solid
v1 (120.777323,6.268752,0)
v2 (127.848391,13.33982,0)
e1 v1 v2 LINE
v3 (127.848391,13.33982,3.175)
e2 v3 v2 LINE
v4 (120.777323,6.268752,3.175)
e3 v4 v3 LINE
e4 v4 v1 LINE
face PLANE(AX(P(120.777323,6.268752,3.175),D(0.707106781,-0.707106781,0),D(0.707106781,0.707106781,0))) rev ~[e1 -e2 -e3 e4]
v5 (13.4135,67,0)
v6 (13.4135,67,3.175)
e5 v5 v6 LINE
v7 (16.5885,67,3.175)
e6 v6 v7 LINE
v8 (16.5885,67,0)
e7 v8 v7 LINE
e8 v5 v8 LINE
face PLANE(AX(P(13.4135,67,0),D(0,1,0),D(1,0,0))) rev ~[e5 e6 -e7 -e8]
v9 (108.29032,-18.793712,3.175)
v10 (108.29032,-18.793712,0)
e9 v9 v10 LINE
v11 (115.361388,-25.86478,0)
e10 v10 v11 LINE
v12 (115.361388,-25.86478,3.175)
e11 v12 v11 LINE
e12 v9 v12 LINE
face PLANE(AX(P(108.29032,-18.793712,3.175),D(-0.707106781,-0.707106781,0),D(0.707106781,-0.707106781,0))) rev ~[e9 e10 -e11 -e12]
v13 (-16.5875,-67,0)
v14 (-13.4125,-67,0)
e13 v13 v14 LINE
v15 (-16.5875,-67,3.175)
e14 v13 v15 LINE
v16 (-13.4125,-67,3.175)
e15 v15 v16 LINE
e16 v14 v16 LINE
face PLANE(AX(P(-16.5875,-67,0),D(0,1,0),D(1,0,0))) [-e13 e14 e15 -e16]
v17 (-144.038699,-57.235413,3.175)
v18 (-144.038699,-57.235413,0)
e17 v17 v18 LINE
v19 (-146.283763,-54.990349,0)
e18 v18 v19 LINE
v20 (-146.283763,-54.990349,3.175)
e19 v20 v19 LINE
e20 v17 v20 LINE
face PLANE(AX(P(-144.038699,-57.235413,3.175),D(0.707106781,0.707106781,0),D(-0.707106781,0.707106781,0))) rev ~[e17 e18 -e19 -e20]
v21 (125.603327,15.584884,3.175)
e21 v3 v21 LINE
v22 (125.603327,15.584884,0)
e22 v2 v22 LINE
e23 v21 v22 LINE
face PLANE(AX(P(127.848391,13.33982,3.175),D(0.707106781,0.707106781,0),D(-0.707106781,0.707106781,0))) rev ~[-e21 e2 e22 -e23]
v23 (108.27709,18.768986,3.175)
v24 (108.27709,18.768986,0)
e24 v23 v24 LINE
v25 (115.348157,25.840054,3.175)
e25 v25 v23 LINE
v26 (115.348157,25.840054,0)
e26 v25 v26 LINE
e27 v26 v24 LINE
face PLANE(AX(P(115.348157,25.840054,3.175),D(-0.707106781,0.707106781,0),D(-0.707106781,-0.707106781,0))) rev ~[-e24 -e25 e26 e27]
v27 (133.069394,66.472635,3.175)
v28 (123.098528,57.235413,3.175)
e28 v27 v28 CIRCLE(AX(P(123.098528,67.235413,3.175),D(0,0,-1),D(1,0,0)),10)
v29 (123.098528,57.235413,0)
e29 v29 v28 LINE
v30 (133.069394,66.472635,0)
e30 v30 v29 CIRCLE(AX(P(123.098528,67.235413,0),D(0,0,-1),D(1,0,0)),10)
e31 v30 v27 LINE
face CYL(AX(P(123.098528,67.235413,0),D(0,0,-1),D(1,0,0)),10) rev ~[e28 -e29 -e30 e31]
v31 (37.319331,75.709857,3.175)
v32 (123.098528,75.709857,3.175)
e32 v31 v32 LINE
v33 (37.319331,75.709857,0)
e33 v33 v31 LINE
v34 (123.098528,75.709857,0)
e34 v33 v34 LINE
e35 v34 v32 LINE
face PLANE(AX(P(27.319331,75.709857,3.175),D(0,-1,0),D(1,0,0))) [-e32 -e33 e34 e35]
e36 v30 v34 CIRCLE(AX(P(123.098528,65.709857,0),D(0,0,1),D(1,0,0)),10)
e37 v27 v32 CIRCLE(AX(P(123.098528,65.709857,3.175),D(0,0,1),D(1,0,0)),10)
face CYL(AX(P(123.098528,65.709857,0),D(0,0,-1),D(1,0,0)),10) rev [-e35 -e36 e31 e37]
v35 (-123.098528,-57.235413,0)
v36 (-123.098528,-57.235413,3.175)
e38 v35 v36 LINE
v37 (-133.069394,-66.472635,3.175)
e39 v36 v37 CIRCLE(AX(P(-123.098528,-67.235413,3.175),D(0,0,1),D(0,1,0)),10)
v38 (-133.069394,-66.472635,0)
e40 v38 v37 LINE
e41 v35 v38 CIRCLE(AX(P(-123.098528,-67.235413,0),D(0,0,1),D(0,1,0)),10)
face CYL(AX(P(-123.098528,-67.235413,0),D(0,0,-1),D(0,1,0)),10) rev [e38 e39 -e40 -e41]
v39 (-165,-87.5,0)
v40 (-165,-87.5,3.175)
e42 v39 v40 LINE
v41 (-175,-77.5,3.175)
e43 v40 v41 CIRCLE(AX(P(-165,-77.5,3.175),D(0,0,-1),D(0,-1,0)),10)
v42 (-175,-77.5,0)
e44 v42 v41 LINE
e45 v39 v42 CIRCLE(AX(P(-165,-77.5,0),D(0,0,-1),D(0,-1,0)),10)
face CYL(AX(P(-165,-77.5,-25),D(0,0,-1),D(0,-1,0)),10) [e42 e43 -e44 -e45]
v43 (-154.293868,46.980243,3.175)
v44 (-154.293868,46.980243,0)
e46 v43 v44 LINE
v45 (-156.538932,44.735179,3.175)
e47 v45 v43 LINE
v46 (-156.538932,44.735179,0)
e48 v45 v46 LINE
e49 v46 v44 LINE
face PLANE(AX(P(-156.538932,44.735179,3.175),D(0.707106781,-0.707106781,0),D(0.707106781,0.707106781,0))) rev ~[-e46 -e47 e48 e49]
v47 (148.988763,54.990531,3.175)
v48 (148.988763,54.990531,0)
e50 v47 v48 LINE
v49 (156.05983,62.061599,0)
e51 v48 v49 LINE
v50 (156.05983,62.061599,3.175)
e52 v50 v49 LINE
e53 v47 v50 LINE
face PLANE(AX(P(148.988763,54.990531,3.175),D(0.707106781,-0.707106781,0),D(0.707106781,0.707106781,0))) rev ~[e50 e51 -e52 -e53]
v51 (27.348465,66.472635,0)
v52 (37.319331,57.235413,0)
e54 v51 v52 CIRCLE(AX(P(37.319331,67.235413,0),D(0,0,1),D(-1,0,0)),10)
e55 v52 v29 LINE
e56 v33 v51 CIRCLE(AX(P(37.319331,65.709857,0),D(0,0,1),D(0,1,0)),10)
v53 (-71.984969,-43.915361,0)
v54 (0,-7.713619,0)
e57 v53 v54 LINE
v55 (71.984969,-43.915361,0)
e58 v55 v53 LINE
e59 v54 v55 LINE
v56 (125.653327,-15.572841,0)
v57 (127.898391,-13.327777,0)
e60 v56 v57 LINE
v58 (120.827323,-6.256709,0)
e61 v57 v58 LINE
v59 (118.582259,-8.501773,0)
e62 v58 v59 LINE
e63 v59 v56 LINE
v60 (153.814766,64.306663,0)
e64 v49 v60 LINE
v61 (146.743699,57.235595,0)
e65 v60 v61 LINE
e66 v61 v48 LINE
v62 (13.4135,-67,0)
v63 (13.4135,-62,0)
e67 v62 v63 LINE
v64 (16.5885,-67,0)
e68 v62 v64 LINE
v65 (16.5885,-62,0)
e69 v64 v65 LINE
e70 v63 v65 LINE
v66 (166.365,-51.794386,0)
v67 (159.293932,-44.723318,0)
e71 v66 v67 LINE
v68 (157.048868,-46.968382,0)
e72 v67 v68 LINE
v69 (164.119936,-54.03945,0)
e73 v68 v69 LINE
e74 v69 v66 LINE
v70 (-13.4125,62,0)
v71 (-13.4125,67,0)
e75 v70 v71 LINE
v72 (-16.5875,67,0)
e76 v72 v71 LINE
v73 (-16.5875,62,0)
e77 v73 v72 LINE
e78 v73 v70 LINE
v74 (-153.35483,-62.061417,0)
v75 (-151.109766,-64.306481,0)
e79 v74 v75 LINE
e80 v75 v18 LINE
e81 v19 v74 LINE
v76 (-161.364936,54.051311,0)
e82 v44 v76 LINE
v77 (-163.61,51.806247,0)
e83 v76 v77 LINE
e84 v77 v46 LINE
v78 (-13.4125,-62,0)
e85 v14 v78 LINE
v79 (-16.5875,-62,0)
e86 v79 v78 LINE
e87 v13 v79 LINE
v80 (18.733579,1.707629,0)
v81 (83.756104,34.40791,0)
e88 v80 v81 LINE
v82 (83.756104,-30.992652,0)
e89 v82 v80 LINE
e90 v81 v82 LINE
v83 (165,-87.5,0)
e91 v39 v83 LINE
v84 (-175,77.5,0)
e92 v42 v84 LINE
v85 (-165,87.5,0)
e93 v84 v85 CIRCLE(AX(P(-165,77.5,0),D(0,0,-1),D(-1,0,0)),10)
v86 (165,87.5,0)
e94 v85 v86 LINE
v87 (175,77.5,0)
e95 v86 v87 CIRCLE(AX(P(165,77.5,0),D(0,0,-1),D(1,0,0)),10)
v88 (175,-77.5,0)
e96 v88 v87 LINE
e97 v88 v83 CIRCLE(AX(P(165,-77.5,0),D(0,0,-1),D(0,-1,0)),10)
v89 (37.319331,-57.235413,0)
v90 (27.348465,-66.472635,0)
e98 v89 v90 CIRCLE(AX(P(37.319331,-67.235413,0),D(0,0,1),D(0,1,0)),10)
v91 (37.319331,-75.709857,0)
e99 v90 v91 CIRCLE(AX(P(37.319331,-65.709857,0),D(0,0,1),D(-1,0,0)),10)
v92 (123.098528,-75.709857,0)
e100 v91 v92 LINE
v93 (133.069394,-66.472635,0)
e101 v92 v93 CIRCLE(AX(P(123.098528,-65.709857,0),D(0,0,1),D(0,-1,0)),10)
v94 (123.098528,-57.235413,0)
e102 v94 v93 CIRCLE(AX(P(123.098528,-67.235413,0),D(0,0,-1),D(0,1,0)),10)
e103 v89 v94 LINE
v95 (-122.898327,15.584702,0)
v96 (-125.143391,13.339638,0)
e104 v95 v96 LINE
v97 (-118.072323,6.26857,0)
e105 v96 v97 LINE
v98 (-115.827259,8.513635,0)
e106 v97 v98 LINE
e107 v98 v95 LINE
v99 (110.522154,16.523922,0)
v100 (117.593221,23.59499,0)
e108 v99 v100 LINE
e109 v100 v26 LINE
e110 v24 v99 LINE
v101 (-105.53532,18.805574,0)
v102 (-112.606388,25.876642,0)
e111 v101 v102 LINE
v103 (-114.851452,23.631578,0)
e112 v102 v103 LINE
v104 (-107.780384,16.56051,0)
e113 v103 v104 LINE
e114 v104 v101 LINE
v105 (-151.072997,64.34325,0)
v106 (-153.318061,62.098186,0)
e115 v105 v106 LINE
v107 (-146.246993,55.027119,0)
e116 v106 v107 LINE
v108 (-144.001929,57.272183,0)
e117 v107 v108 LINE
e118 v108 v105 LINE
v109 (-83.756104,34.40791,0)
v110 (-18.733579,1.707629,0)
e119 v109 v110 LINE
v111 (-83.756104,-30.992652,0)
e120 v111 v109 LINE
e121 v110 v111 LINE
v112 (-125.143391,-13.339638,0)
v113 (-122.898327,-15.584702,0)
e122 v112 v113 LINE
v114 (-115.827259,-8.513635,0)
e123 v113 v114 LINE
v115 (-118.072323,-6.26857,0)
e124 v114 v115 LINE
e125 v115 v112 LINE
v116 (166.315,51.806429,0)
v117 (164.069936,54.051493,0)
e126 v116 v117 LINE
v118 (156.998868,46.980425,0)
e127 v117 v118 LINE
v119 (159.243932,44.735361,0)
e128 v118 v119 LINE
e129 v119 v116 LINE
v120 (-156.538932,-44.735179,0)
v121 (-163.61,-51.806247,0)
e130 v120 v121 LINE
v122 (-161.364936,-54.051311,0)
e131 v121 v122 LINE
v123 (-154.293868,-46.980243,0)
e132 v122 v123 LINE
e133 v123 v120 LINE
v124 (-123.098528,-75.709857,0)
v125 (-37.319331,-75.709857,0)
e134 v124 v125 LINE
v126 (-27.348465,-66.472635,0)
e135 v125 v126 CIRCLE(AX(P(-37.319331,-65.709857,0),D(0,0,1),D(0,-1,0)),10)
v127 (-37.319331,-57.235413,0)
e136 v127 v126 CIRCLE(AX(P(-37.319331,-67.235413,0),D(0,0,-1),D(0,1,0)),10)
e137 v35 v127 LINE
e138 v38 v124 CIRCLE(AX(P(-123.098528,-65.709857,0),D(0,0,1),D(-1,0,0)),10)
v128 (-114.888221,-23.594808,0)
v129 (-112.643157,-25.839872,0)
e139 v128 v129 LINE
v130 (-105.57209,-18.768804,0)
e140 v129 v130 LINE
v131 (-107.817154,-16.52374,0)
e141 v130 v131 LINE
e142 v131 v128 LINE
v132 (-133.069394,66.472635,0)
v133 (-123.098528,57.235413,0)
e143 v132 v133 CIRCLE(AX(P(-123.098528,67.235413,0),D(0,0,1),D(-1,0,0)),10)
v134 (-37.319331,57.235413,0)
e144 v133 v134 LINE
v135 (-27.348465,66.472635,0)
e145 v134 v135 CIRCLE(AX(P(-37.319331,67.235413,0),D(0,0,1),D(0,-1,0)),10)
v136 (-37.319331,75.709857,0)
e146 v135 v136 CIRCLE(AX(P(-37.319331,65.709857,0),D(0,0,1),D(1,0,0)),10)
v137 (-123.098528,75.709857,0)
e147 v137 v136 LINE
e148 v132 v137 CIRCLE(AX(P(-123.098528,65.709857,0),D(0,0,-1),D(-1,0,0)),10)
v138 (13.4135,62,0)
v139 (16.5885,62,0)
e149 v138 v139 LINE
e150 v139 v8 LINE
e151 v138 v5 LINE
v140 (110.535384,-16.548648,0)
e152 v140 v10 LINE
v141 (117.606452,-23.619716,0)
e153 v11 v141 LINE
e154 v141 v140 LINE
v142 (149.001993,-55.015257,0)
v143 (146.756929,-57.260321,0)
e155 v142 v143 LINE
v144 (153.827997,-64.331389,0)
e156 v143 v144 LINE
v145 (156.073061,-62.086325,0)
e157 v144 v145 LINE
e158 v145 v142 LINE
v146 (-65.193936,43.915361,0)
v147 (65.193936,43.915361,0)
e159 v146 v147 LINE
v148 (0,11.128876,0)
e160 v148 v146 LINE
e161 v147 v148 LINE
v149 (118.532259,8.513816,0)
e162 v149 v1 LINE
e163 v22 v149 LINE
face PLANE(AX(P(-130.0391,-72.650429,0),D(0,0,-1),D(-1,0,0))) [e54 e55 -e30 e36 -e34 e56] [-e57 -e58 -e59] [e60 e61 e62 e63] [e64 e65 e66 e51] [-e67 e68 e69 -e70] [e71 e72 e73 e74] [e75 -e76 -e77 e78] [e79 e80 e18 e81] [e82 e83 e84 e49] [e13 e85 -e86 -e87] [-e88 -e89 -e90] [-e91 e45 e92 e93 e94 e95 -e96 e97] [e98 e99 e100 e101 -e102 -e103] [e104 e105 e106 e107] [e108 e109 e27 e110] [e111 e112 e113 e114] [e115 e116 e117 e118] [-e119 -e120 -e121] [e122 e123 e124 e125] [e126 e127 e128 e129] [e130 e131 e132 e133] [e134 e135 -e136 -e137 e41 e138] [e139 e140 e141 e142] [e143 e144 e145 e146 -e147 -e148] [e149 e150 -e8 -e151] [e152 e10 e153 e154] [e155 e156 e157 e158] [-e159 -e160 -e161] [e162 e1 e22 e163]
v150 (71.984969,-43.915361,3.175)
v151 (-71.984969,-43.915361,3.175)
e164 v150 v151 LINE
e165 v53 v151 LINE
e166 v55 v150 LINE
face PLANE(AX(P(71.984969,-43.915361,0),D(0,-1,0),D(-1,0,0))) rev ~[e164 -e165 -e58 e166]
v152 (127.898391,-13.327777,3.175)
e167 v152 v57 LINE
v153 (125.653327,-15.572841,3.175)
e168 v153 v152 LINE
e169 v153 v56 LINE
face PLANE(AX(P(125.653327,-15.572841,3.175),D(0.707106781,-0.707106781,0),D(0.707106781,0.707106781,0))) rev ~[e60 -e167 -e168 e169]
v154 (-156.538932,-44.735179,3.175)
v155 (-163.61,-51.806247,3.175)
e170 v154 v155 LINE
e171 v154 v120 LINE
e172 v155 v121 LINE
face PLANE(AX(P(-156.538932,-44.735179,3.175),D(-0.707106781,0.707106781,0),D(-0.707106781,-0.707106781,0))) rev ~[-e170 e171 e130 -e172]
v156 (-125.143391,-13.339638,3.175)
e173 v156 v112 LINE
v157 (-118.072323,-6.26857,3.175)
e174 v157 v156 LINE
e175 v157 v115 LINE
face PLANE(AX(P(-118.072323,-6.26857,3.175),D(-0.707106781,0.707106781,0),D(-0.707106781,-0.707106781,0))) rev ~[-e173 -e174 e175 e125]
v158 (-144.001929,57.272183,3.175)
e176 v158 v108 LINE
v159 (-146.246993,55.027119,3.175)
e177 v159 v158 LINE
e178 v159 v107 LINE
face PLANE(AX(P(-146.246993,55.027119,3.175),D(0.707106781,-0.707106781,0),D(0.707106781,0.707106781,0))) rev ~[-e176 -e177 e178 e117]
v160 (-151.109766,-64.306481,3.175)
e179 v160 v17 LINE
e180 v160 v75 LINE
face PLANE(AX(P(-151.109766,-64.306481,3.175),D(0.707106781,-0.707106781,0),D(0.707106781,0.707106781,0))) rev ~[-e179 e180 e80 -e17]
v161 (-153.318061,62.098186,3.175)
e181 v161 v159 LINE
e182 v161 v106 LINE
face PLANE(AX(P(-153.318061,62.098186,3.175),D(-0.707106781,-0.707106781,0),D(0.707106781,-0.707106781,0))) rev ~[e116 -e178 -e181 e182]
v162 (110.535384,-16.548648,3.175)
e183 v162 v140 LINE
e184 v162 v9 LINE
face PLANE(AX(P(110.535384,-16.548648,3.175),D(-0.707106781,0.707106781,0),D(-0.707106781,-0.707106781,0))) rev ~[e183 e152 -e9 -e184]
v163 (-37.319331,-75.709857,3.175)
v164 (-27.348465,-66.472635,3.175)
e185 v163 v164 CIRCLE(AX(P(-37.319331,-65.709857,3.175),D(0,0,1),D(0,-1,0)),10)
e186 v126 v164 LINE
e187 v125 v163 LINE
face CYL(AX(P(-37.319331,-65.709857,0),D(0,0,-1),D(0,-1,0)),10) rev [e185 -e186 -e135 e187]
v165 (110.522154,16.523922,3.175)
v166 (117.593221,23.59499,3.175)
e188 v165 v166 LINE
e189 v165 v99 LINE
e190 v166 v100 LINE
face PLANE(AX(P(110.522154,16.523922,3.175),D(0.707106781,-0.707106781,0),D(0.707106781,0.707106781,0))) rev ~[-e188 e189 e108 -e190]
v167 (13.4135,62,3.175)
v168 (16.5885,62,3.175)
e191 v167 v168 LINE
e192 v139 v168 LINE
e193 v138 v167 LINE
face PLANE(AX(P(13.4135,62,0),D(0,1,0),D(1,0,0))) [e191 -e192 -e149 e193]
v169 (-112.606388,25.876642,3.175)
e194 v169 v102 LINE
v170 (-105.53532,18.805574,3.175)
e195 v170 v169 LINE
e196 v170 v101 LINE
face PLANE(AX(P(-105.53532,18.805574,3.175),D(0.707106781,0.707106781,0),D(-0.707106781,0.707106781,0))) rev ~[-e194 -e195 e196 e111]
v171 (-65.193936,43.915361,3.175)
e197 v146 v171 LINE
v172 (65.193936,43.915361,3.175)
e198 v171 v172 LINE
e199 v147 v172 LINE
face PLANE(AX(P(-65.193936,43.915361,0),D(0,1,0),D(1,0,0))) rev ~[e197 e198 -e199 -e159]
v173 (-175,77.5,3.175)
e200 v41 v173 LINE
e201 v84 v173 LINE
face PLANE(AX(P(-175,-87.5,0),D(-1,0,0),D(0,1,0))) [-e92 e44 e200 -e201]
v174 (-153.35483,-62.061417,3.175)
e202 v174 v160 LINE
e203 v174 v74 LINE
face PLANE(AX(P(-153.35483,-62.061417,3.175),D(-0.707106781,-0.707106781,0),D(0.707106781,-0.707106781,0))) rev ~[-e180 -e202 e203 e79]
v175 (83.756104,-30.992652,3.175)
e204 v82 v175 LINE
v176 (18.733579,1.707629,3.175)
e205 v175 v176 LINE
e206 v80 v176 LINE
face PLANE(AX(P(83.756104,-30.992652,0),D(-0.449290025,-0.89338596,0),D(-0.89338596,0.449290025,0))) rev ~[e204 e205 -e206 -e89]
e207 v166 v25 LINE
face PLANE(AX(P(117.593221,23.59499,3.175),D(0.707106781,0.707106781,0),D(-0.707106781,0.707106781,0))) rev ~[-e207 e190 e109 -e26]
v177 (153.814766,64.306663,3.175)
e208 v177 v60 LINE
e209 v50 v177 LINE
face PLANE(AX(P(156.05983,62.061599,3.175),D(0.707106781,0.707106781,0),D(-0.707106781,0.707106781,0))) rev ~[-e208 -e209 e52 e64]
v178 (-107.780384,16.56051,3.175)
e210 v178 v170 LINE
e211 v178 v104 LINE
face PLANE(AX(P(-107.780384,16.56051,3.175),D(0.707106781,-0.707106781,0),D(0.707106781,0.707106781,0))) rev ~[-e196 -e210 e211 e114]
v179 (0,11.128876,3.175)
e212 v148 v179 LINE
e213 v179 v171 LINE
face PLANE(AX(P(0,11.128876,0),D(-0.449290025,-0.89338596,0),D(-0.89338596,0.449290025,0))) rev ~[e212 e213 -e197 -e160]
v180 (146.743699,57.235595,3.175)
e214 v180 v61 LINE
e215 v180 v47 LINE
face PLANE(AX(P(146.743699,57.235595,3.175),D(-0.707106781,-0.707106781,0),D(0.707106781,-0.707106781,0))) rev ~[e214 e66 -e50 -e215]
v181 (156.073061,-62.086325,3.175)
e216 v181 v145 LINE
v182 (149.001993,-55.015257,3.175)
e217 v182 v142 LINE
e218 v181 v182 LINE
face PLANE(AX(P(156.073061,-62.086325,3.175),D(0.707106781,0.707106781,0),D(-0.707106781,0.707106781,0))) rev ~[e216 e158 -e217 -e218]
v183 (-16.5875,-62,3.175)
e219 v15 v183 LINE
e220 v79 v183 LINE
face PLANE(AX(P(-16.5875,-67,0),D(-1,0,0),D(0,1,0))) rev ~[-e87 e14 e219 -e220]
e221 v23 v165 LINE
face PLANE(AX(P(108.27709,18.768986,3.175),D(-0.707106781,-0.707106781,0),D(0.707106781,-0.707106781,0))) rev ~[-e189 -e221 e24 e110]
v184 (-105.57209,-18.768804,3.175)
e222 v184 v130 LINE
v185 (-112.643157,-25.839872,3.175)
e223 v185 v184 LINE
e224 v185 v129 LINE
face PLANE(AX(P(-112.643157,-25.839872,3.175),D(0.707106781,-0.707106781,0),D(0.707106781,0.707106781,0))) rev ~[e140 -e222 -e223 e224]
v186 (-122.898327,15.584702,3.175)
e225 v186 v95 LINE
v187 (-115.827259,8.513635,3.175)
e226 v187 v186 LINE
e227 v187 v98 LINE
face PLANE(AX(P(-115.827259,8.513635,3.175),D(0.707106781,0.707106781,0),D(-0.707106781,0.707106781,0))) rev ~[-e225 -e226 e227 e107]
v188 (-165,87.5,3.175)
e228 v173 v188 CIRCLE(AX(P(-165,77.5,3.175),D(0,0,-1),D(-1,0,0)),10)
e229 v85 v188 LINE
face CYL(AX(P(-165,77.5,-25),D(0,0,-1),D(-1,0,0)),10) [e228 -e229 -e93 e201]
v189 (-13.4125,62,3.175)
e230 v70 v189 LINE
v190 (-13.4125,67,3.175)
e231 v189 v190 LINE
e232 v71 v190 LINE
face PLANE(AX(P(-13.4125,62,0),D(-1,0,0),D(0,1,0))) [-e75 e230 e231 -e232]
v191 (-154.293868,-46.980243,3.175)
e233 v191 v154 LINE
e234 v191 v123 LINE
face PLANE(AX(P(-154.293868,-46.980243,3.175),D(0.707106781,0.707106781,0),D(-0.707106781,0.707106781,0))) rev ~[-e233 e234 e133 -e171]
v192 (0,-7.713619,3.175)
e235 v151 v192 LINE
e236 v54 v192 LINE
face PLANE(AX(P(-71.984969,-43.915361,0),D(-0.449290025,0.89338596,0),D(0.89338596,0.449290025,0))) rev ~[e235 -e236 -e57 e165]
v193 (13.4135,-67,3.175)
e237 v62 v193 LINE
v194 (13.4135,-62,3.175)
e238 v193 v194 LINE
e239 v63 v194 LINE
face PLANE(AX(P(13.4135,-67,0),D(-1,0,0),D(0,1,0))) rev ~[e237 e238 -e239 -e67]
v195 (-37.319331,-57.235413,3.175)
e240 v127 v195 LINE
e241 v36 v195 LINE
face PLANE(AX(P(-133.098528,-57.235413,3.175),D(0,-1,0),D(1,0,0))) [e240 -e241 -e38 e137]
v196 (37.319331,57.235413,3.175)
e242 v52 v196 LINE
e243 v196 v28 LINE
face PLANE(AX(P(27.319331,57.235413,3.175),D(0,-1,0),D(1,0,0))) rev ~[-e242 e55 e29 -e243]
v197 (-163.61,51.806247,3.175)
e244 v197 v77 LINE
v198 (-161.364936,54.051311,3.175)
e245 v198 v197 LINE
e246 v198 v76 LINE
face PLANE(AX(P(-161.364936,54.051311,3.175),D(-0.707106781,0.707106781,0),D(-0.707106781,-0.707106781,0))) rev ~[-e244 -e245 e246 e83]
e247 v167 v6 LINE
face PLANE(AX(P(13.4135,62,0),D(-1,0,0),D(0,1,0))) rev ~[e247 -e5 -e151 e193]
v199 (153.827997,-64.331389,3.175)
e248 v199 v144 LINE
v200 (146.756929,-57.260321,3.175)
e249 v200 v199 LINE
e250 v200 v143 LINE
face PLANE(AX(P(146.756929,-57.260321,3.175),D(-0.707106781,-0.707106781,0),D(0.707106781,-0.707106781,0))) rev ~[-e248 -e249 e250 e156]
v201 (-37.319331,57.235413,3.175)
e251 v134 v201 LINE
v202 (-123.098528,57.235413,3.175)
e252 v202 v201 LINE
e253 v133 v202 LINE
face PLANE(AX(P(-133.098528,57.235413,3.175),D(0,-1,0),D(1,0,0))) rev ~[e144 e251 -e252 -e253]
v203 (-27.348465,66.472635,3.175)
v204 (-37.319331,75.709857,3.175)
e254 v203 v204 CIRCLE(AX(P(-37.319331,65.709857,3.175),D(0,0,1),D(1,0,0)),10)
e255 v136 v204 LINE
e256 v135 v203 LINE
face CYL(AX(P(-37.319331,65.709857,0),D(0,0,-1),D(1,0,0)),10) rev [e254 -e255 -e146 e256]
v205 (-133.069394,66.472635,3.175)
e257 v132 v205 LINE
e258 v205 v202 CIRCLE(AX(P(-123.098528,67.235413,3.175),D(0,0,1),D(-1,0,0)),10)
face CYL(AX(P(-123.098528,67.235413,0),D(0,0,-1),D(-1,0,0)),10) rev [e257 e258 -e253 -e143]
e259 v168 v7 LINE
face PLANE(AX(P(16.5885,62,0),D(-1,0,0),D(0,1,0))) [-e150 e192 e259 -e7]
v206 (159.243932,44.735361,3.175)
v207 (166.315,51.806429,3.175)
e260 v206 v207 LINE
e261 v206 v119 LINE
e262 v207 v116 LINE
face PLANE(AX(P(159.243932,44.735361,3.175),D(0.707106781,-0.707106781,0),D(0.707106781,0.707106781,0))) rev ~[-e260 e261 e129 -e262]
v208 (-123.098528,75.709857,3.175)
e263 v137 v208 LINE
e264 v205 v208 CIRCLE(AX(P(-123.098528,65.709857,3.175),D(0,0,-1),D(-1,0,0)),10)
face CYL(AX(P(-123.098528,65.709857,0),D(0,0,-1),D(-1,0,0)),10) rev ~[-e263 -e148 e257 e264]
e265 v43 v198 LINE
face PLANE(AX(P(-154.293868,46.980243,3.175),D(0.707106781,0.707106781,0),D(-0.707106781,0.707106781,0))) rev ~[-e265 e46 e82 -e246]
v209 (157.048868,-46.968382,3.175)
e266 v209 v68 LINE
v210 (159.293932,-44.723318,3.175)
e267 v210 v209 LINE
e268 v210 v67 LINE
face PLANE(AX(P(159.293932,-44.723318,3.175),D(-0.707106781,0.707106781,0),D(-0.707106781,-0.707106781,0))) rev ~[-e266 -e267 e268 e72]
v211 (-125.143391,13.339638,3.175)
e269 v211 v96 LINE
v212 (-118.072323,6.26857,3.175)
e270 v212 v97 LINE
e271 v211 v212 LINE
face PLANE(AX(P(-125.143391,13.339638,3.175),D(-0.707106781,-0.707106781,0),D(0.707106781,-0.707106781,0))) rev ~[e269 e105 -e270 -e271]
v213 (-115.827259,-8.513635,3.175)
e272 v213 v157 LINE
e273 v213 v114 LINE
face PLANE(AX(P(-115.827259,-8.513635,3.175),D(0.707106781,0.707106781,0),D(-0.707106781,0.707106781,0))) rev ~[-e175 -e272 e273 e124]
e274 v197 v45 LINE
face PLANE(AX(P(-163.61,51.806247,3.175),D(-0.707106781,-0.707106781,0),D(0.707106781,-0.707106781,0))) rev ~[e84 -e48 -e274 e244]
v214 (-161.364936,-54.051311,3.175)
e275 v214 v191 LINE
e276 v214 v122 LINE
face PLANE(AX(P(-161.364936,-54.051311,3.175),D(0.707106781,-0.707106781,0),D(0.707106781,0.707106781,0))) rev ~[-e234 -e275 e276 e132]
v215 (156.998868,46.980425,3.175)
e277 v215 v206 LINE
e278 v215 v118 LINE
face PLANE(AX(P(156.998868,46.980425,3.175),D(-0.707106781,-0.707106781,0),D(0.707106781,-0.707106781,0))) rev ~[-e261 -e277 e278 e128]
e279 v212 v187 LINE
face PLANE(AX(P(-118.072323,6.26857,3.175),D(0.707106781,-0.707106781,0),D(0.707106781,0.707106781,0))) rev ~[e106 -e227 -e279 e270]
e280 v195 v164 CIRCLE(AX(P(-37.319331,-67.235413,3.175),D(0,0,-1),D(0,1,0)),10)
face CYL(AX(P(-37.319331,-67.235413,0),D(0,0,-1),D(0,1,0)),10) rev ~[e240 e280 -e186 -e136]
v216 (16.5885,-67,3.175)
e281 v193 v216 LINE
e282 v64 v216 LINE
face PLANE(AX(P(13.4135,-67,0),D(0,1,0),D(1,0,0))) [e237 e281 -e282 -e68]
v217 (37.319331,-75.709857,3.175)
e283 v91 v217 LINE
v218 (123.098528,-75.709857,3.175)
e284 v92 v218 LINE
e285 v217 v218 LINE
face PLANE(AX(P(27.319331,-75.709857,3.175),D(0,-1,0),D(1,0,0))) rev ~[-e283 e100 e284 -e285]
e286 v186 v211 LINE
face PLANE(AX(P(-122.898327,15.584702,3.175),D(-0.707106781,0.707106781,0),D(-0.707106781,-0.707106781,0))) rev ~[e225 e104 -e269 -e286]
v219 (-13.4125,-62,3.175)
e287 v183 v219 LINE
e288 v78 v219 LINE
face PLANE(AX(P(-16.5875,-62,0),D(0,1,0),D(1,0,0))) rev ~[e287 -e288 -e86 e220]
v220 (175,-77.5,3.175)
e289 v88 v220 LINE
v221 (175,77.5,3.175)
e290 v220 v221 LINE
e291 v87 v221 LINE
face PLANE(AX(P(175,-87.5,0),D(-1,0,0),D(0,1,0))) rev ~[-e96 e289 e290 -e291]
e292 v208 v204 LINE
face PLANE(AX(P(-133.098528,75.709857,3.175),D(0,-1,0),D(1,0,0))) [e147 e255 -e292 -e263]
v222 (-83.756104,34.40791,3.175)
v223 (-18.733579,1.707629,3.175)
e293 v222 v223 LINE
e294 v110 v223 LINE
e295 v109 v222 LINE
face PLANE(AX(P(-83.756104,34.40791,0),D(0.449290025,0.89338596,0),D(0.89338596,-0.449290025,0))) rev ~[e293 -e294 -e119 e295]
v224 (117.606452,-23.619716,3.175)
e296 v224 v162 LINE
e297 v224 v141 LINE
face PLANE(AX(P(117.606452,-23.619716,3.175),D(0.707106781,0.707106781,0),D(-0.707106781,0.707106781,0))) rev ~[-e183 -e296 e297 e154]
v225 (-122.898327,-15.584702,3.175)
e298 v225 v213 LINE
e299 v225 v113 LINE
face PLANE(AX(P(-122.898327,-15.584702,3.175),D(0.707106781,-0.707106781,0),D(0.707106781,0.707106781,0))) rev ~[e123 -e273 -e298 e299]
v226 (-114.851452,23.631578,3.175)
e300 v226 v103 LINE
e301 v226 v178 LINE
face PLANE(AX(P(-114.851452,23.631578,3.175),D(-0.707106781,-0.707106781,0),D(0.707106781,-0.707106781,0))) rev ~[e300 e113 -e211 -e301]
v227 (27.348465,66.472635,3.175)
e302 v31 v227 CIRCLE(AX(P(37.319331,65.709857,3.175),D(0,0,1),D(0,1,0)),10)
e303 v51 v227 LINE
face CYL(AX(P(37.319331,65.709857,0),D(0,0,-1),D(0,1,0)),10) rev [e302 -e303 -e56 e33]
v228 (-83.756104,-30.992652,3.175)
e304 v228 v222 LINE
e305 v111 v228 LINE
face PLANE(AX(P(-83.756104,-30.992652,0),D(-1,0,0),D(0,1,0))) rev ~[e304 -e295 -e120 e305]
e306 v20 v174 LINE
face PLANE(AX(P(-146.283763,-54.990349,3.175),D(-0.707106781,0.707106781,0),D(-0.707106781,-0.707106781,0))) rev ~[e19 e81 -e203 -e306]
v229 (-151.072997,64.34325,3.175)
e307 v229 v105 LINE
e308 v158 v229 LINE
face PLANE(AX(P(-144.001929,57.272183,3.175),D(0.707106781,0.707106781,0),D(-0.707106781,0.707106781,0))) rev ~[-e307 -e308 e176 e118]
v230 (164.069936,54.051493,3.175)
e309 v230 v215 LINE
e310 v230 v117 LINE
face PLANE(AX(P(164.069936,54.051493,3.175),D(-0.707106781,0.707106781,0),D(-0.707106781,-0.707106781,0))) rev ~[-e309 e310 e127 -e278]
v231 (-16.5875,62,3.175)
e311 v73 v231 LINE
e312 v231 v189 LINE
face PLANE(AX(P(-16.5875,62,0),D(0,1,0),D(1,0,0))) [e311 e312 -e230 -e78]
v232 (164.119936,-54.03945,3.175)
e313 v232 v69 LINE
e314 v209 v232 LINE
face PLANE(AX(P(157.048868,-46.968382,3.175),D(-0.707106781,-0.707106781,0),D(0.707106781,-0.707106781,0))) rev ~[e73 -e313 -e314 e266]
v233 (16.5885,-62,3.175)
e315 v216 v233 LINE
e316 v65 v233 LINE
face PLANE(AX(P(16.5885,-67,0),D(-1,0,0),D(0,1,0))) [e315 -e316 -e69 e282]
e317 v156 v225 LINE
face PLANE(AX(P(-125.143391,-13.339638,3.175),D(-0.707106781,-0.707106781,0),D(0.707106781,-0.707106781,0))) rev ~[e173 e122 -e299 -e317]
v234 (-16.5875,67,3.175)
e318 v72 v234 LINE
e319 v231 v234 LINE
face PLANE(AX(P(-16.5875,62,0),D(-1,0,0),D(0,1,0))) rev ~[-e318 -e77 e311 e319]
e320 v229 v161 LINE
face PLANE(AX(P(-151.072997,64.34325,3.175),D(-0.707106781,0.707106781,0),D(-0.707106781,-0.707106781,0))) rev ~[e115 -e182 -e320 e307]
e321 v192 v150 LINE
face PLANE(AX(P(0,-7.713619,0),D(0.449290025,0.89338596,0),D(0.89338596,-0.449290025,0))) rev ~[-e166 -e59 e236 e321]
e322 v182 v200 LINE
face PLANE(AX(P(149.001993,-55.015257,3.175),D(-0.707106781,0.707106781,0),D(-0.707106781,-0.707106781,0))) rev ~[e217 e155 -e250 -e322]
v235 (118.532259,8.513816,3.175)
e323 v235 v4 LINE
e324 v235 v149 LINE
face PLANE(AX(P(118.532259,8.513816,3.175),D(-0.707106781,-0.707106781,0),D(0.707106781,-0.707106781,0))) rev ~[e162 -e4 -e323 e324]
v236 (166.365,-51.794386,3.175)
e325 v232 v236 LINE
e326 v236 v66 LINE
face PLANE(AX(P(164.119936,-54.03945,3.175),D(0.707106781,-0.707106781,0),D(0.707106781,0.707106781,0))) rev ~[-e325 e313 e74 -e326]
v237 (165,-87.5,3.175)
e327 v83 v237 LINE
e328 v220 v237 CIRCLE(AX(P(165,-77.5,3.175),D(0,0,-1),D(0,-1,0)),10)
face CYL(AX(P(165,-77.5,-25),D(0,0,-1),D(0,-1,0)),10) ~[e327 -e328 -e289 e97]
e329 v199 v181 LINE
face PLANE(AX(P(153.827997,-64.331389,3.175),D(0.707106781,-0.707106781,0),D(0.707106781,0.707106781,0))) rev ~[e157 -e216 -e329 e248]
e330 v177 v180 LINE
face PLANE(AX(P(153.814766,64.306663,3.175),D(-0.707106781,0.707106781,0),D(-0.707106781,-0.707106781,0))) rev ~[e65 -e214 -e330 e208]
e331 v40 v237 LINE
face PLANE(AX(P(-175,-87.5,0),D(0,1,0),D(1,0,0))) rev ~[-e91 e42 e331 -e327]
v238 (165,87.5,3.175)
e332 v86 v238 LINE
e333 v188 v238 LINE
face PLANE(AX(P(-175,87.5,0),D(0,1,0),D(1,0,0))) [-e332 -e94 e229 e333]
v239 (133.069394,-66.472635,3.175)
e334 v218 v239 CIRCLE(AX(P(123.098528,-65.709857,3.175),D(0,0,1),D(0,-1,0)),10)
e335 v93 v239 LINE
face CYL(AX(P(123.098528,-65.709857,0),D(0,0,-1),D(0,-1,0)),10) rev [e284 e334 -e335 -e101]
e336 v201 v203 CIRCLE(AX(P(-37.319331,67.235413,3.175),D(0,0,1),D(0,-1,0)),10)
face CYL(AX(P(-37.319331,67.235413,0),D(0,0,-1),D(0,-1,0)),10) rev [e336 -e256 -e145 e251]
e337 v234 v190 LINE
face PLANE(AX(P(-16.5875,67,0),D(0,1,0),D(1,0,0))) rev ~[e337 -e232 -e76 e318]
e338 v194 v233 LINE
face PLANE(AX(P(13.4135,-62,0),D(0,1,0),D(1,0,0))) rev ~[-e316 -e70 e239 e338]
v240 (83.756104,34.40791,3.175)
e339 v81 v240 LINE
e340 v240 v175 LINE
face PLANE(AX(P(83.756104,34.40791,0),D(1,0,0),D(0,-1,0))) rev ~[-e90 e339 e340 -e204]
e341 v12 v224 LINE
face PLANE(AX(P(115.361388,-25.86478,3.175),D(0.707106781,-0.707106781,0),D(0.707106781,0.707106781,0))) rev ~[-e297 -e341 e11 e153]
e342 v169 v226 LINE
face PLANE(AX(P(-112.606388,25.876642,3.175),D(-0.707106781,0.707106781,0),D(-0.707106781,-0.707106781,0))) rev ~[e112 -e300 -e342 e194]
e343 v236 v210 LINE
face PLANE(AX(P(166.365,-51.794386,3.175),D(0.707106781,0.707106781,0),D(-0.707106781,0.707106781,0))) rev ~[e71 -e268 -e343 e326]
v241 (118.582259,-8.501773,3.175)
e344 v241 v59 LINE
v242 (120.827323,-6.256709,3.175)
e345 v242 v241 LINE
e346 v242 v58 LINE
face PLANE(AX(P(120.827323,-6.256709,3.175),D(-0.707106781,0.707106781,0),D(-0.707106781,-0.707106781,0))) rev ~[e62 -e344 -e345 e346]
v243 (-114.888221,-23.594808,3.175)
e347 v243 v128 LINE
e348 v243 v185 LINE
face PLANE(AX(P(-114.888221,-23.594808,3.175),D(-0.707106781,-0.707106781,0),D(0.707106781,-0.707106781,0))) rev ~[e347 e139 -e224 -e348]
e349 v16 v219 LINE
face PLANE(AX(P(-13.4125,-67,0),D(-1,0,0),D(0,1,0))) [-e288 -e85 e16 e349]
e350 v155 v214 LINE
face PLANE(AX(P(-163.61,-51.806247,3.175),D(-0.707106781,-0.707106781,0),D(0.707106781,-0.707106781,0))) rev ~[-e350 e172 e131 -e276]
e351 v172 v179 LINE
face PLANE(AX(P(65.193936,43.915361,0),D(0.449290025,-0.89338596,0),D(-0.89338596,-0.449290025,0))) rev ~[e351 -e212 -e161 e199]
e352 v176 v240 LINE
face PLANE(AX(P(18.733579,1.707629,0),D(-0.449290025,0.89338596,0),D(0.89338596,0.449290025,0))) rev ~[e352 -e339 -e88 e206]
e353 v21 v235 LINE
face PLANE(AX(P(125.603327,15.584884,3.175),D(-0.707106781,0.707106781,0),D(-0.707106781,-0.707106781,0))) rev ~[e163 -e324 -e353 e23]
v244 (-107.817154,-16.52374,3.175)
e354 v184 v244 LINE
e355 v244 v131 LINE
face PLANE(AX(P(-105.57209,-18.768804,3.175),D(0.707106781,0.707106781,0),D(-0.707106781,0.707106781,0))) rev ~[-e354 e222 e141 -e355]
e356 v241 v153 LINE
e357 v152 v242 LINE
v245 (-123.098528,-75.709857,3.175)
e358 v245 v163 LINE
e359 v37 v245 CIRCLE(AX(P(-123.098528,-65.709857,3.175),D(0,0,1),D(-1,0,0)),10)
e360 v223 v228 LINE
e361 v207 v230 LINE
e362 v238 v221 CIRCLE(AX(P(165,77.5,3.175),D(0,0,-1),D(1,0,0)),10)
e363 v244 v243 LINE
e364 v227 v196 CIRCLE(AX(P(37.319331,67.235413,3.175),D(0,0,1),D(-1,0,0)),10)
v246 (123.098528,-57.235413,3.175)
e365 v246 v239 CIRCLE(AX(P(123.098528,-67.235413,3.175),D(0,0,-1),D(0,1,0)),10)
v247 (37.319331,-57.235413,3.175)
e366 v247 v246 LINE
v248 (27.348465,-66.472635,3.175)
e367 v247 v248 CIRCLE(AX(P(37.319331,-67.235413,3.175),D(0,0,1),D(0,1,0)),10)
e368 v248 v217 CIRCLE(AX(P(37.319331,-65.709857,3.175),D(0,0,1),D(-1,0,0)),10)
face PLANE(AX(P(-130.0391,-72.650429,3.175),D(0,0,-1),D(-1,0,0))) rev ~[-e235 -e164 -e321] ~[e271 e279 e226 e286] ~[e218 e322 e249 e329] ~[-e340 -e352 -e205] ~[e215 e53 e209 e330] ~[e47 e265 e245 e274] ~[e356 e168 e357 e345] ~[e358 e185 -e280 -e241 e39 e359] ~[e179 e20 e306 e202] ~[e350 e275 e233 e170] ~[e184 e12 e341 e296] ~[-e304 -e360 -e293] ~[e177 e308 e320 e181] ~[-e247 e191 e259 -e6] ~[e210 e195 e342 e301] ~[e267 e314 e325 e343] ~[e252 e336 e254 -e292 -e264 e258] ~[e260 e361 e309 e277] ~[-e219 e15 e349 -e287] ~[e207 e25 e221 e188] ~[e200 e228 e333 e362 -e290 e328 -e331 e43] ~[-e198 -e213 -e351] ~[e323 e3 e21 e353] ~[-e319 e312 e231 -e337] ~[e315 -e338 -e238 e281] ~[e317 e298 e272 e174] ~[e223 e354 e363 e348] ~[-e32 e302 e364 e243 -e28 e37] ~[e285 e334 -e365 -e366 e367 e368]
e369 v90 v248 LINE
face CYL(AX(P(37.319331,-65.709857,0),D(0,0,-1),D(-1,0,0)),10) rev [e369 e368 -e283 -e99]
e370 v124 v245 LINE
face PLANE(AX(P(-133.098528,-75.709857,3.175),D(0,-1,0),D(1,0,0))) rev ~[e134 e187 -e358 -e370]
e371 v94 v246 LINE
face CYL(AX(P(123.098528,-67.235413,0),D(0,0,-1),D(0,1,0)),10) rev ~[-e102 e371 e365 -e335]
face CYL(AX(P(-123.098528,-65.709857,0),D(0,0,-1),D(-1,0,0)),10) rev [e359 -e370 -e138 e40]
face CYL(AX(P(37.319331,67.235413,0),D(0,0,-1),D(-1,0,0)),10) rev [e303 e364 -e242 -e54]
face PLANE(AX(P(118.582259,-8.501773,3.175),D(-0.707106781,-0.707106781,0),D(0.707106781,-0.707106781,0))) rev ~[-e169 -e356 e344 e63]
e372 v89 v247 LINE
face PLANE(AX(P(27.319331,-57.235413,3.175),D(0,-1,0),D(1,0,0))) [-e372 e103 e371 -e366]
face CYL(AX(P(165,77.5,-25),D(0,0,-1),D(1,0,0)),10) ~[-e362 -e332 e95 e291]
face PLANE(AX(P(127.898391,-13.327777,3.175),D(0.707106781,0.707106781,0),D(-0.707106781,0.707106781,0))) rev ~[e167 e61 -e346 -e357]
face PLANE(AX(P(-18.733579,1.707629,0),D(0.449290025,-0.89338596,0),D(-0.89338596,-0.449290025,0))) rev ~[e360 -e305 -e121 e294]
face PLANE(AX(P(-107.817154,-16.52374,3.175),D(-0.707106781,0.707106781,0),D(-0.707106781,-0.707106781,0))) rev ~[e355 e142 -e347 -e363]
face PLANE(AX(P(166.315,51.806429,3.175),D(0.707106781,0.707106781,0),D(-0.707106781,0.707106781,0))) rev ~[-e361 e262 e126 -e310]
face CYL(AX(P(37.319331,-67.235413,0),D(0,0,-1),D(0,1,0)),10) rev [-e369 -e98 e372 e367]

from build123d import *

# Parameters (mm, degrees)
F0_W        = 350
F0_H        = 175
F0_W_2      = 3.175
F0_H_2      = 5
F1_DEPTH    = 3.175
F3_DEPTH    = 25
F4_W        = 105.779197067
F4_H        = 18.4744439814
F5_DEPTH    = 25
F6_T1_DEPTH = 3.175
F6_T3_DEPTH = 53.175
F8_DEPTH    = 25


# Not quite as in the source:
# - a fillet or chamfer that OpenCascade refuses, or shapes differently, is made with other operations: its cross-section is extruded or revolved along the edge and cut away or added


with BuildPart() as f1:
    # F0 (on Top) → F1 (new body)
    with BuildSketch(Plane.XY):
        Rectangle(F0_W, F0_H)
        with Locations((-15, -64.5)):
            Rectangle(F0_W_2, F0_H_2, mode=Mode.SUBTRACT)
        with Locations((15.001, -64.5)):
            Rectangle(F0_W_2, F0_H_2, mode=Mode.SUBTRACT)
        with Locations((-15, 64.5)):
            Rectangle(F0_W_2, F0_H_2, mode=Mode.SUBTRACT)
        with Locations((15.001, 64.5)):
            Rectangle(F0_W_2, F0_H_2, mode=Mode.SUBTRACT)
    extrude(amount=F1_DEPTH)

    # F2 (on face) → F3 (cut)
    with BuildSketch(Plane.XY.offset(3.175)):
        Polygon((-156.5389321881, -44.7351793874), (-163.61, -51.8062471993), (-161.3649359697, -54.0513112295), (-154.2938681579, -46.9802434177), align=None)
        Polygon((-146.2837625406, -54.9903490349), (-153.3548303525, -62.0614168468), (-151.1097663222, -64.3064808771), (-144.0386985103, -57.2354130652), align=None)
        Polygon((159.2439321881, 44.7353613385), (166.315, 51.8064291503), (164.0699359697, 54.0514931806), (156.9988681579, 46.9804253687), align=None)
        Polygon((148.9887625406, 54.990530986), (156.0598303525, 62.0615987979), (153.8147663222, 64.3066628282), (146.7436985103, 57.2355950163), align=None)
        Polygon((-161.3649359697, 54.0513112295), (-163.61, 51.8062471993), (-156.5389321881, 44.7351793874), (-154.2938681579, 46.9802434177), align=None)
        Polygon((-151.0729967696, 64.3432504297), (-153.3180607998, 62.0981863994), (-146.246992988, 55.0271185876), (-144.0019289577, 57.2721826178), align=None)
        Polygon((157.0488681579, -46.9683818087), (164.1199359697, -54.0394496205), (166.365, -51.7943855903), (159.2939321881, -44.7233177784), align=None)
        Polygon((146.7569289577, -57.2603210088), (153.8279967696, -64.3313888207), (156.0730607998, -62.0863247904), (149.001992988, -55.0152569786), align=None)
        Polygon((118.5822592613, -8.5017729121), (125.6533270732, -15.572840724), (127.8983911035, -13.3277766937), (120.8273232916, -6.2567088818), align=None)
        Polygon((108.2903200611, -18.7937121123), (115.361387873, -25.8647799241), (117.6064519033, -23.6197158939), (110.5353840914, -16.548648082), align=None)
        Polygon((120.7773232916, 6.2687524419), (127.8483911035, 13.3398202538), (125.6033270732, 15.5848842841), (118.5322592613, 8.5138164722), align=None)
        Polygon((110.522153644, 16.5239220895), (117.5932214559, 23.5949899013), (115.3481574256, 25.8400539316), (108.2770896138, 18.7689861197), align=None)
        Polygon((-122.8983270732, 15.584702333), (-125.1433911035, 13.3396383027), (-118.0723232916, 6.2685704909), (-115.8272592613, 8.5136345211), align=None)
        Polygon((-112.606387873, 25.8766415332), (-114.8514519033, 23.6315775029), (-107.7803840914, 16.560509691), (-105.5353200611, 18.8055737213), align=None)
        Polygon((-118.0723232916, -6.2685704909), (-125.1433911035, -13.3396383027), (-122.8983270732, -15.584702333), (-115.8272592613, -8.5136345211), align=None)
        Polygon((-107.817153644, -16.5237401384), (-114.8882214559, -23.5948079503), (-112.6431574256, -25.8398719805), (-105.5720896138, -18.7688041687), align=None)
    extrude(amount=-F3_DEPTH, mode=Mode.SUBTRACT)

    # F4 (on face) → F5 (cut)
    with BuildSketch(Plane.XY.offset(3.175)):
        with Locations((-80.2089292556, 66.4726350559)):
            Rectangle(F4_W, F4_H)
        with Locations((-80.2089292556, -66.4726350559)):
            Rectangle(F4_W, F4_H)
        with Locations((80.2089292556, -66.4726350559)):
            Rectangle(F4_W, F4_H)
        with Locations((80.2089292556, 66.4726350559)):
            Rectangle(F4_W, F4_H)
    extrude(amount=-F5_DEPTH, mode=Mode.SUBTRACT)

    # F6: fillet of radius 10 on 20 edges, made by hand

    # F6_s2 → F6_t1 (join)
    with BuildSketch(Plane.XY):
        with BuildLine():
            ThreePointArc((-133.0985277891, -65.7098570466), (-130.169595601, -72.7809248585), (-123.0985277891, -75.7098570466))
            Line((-123.0985277891, -75.7098570466), (-133.0985277891, -75.7098570466))
            Line((-133.0985277891, -75.7098570466), (-133.0985277891, -65.7098570466))
        make_face()
        with BuildLine():
            ThreePointArc((-123.0985277891, -57.2354130652), (-130.169595601, -60.1643452533), (-133.0985277891, -67.2354130652))
            Line((-133.0985277891, -67.2354130652), (-133.0985277891, -57.2354130652))
            Line((-133.0985277891, -57.2354130652), (-123.0985277891, -57.2354130652))
        make_face()
        with BuildLine():
            ThreePointArc((-37.3193307221, -57.2354130652), (-30.2482629102, -60.1643452533), (-27.3193307221, -67.2354130652))
            Line((-27.3193307221, -67.2354130652), (-27.3193307221, -57.2354130652))
            Line((-27.3193307221, -57.2354130652), (-37.3193307221, -57.2354130652))
        make_face()
        with BuildLine():
            ThreePointArc((-37.3193307221, -75.7098570466), (-30.2482629102, -72.7809248585), (-27.3193307221, -65.7098570466))
            Line((-27.3193307221, -65.7098570466), (-27.3193307221, -75.7098570466))
            Line((-27.3193307221, -75.7098570466), (-37.3193307221, -75.7098570466))
        make_face()
        with BuildLine():
            ThreePointArc((123.0985277891, -57.2354130652), (130.169595601, -60.1643452533), (133.0985277891, -67.2354130652))
            Line((133.0985277891, -67.2354130652), (133.0985277891, -57.2354130652))
            Line((133.0985277891, -57.2354130652), (123.0985277891, -57.2354130652))
        make_face()
        with BuildLine():
            ThreePointArc((123.0985277891, -75.7098570466), (130.169595601, -72.7809248585), (133.0985277891, -65.7098570466))
            Line((133.0985277891, -65.7098570466), (133.0985277891, -75.7098570466))
            Line((133.0985277891, -75.7098570466), (123.0985277891, -75.7098570466))
        make_face()
        with BuildLine():
            ThreePointArc((37.3193307221, -57.2354130652), (30.2482629102, -60.1643452533), (27.3193307221, -67.2354130652))
            Line((27.3193307221, -67.2354130652), (27.3193307221, -57.2354130652))
            Line((27.3193307221, -57.2354130652), (37.3193307221, -57.2354130652))
        make_face()
        with BuildLine():
            ThreePointArc((27.3193307221, -65.7098570466), (30.2482629102, -72.7809248585), (37.3193307221, -75.7098570466))
            Line((37.3193307221, -75.7098570466), (27.3193307221, -75.7098570466))
            Line((27.3193307221, -75.7098570466), (27.3193307221, -65.7098570466))
        make_face()
        with BuildLine():
            ThreePointArc((133.0985277891, 65.7098570466), (130.169595601, 72.7809248585), (123.0985277891, 75.7098570466))
            Line((123.0985277891, 75.7098570466), (133.0985277891, 75.7098570466))
            Line((133.0985277891, 75.7098570466), (133.0985277891, 65.7098570466))
        make_face()
        with BuildLine():
            ThreePointArc((133.0985277891, 67.2354130652), (130.169595601, 60.1643452533), (123.0985277891, 57.2354130652))
            Line((123.0985277891, 57.2354130652), (133.0985277891, 57.2354130652))
            Line((133.0985277891, 57.2354130652), (133.0985277891, 67.2354130652))
        make_face()
        with BuildLine():
            ThreePointArc((37.3193307221, 75.7098570466), (30.2482629102, 72.7809248585), (27.3193307221, 65.7098570466))
            Line((27.3193307221, 65.7098570466), (27.3193307221, 75.7098570466))
            Line((27.3193307221, 75.7098570466), (37.3193307221, 75.7098570466))
        make_face()
        with BuildLine():
            ThreePointArc((27.3193307221, 67.2354130652), (30.2482629102, 60.1643452533), (37.3193307221, 57.2354130652))
            Line((37.3193307221, 57.2354130652), (27.3193307221, 57.2354130652))
            Line((27.3193307221, 57.2354130652), (27.3193307221, 67.2354130652))
        make_face()
        with BuildLine():
            ThreePointArc((-27.3193307221, 65.7098570466), (-30.2482629102, 72.7809248585), (-37.3193307221, 75.7098570466))
            Line((-37.3193307221, 75.7098570466), (-27.3193307221, 75.7098570466))
            Line((-27.3193307221, 75.7098570466), (-27.3193307221, 65.7098570466))
        make_face()
        with BuildLine():
            ThreePointArc((-37.3193307221, 57.2354130652), (-30.2482629102, 60.1643452533), (-27.3193307221, 67.2354130652))
            Line((-27.3193307221, 67.2354130652), (-27.3193307221, 57.2354130652))
            Line((-27.3193307221, 57.2354130652), (-37.3193307221, 57.2354130652))
        make_face()
        with BuildLine():
            ThreePointArc((-133.0985277891, 67.2354130652), (-130.169595601, 60.1643452533), (-123.0985277891, 57.2354130652))
            Line((-123.0985277891, 57.2354130652), (-133.0985277891, 57.2354130652))
            Line((-133.0985277891, 57.2354130652), (-133.0985277891, 67.2354130652))
        make_face()
        with BuildLine():
            ThreePointArc((-133.0985277891, 65.7098570466), (-130.169595601, 72.7809248585), (-123.0985277891, 75.7098570466))
            Line((-123.0985277891, 75.7098570466), (-133.0985277891, 75.7098570466))
            Line((-133.0985277891, 75.7098570466), (-133.0985277891, 65.7098570466))
        make_face()
    extrude(amount=F6_T1_DEPTH)

    # F6_s4 → F6_t3 (cut)
    with BuildSketch(Plane.XY.offset(-25)):
        with BuildLine():
            ThreePointArc((-175, 77.5), (-172.0710678119, 84.5710678119), (-165, 87.5))
            Line((-165, 87.5), (-175, 87.5))
            Line((-175, 87.5), (-175, 77.5))
        make_face()
        with BuildLine():
            ThreePointArc((175, 77.5), (172.0710678119, 84.5710678119), (165, 87.5))
            Line((165, 87.5), (175, 87.5))
            Line((175, 87.5), (175, 77.5))
        make_face()
        with BuildLine():
            ThreePointArc((165, -87.5), (172.0710678119, -84.5710678119), (175, -77.5))
            Line((175, -77.5), (175, -87.5))
            Line((175, -87.5), (165, -87.5))
        make_face()
        with BuildLine():
            ThreePointArc((-165, -87.5), (-172.0710678119, -84.5710678119), (-175, -77.5))
            Line((-175, -77.5), (-175, -87.5))
            Line((-175, -87.5), (-165, -87.5))
        make_face()
    extrude(amount=F6_T3_DEPTH, mode=Mode.SUBTRACT)

    # F7 (on face) → F8 (cut)
    with BuildSketch(Plane(origin=(0, 0, 0), x_dir=(1, 0, 0), z_dir=(0, 0, -1))):
        Polygon((83.7561041117, 30.9926522097), (18.7335789211, -1.7076288749), (83.7561041117, -34.4079099596), align=None)
        Polygon((65.1939362288, -43.915361166), (0, -11.1288762757), (-65.1939362288, -43.915361166), align=None)
        Polygon((-18.7335789211, -1.7076288749), (-83.7561041117, 30.9926522097), (-83.7561041117, -34.4079099596), align=None)
        Polygon((71.9849690795, 43.915361166), (-71.9849690795, 43.915361166), (0, 7.7136185258), align=None)
    extrude(amount=-F8_DEPTH, mode=Mode.SUBTRACT)


solid = f1.part
